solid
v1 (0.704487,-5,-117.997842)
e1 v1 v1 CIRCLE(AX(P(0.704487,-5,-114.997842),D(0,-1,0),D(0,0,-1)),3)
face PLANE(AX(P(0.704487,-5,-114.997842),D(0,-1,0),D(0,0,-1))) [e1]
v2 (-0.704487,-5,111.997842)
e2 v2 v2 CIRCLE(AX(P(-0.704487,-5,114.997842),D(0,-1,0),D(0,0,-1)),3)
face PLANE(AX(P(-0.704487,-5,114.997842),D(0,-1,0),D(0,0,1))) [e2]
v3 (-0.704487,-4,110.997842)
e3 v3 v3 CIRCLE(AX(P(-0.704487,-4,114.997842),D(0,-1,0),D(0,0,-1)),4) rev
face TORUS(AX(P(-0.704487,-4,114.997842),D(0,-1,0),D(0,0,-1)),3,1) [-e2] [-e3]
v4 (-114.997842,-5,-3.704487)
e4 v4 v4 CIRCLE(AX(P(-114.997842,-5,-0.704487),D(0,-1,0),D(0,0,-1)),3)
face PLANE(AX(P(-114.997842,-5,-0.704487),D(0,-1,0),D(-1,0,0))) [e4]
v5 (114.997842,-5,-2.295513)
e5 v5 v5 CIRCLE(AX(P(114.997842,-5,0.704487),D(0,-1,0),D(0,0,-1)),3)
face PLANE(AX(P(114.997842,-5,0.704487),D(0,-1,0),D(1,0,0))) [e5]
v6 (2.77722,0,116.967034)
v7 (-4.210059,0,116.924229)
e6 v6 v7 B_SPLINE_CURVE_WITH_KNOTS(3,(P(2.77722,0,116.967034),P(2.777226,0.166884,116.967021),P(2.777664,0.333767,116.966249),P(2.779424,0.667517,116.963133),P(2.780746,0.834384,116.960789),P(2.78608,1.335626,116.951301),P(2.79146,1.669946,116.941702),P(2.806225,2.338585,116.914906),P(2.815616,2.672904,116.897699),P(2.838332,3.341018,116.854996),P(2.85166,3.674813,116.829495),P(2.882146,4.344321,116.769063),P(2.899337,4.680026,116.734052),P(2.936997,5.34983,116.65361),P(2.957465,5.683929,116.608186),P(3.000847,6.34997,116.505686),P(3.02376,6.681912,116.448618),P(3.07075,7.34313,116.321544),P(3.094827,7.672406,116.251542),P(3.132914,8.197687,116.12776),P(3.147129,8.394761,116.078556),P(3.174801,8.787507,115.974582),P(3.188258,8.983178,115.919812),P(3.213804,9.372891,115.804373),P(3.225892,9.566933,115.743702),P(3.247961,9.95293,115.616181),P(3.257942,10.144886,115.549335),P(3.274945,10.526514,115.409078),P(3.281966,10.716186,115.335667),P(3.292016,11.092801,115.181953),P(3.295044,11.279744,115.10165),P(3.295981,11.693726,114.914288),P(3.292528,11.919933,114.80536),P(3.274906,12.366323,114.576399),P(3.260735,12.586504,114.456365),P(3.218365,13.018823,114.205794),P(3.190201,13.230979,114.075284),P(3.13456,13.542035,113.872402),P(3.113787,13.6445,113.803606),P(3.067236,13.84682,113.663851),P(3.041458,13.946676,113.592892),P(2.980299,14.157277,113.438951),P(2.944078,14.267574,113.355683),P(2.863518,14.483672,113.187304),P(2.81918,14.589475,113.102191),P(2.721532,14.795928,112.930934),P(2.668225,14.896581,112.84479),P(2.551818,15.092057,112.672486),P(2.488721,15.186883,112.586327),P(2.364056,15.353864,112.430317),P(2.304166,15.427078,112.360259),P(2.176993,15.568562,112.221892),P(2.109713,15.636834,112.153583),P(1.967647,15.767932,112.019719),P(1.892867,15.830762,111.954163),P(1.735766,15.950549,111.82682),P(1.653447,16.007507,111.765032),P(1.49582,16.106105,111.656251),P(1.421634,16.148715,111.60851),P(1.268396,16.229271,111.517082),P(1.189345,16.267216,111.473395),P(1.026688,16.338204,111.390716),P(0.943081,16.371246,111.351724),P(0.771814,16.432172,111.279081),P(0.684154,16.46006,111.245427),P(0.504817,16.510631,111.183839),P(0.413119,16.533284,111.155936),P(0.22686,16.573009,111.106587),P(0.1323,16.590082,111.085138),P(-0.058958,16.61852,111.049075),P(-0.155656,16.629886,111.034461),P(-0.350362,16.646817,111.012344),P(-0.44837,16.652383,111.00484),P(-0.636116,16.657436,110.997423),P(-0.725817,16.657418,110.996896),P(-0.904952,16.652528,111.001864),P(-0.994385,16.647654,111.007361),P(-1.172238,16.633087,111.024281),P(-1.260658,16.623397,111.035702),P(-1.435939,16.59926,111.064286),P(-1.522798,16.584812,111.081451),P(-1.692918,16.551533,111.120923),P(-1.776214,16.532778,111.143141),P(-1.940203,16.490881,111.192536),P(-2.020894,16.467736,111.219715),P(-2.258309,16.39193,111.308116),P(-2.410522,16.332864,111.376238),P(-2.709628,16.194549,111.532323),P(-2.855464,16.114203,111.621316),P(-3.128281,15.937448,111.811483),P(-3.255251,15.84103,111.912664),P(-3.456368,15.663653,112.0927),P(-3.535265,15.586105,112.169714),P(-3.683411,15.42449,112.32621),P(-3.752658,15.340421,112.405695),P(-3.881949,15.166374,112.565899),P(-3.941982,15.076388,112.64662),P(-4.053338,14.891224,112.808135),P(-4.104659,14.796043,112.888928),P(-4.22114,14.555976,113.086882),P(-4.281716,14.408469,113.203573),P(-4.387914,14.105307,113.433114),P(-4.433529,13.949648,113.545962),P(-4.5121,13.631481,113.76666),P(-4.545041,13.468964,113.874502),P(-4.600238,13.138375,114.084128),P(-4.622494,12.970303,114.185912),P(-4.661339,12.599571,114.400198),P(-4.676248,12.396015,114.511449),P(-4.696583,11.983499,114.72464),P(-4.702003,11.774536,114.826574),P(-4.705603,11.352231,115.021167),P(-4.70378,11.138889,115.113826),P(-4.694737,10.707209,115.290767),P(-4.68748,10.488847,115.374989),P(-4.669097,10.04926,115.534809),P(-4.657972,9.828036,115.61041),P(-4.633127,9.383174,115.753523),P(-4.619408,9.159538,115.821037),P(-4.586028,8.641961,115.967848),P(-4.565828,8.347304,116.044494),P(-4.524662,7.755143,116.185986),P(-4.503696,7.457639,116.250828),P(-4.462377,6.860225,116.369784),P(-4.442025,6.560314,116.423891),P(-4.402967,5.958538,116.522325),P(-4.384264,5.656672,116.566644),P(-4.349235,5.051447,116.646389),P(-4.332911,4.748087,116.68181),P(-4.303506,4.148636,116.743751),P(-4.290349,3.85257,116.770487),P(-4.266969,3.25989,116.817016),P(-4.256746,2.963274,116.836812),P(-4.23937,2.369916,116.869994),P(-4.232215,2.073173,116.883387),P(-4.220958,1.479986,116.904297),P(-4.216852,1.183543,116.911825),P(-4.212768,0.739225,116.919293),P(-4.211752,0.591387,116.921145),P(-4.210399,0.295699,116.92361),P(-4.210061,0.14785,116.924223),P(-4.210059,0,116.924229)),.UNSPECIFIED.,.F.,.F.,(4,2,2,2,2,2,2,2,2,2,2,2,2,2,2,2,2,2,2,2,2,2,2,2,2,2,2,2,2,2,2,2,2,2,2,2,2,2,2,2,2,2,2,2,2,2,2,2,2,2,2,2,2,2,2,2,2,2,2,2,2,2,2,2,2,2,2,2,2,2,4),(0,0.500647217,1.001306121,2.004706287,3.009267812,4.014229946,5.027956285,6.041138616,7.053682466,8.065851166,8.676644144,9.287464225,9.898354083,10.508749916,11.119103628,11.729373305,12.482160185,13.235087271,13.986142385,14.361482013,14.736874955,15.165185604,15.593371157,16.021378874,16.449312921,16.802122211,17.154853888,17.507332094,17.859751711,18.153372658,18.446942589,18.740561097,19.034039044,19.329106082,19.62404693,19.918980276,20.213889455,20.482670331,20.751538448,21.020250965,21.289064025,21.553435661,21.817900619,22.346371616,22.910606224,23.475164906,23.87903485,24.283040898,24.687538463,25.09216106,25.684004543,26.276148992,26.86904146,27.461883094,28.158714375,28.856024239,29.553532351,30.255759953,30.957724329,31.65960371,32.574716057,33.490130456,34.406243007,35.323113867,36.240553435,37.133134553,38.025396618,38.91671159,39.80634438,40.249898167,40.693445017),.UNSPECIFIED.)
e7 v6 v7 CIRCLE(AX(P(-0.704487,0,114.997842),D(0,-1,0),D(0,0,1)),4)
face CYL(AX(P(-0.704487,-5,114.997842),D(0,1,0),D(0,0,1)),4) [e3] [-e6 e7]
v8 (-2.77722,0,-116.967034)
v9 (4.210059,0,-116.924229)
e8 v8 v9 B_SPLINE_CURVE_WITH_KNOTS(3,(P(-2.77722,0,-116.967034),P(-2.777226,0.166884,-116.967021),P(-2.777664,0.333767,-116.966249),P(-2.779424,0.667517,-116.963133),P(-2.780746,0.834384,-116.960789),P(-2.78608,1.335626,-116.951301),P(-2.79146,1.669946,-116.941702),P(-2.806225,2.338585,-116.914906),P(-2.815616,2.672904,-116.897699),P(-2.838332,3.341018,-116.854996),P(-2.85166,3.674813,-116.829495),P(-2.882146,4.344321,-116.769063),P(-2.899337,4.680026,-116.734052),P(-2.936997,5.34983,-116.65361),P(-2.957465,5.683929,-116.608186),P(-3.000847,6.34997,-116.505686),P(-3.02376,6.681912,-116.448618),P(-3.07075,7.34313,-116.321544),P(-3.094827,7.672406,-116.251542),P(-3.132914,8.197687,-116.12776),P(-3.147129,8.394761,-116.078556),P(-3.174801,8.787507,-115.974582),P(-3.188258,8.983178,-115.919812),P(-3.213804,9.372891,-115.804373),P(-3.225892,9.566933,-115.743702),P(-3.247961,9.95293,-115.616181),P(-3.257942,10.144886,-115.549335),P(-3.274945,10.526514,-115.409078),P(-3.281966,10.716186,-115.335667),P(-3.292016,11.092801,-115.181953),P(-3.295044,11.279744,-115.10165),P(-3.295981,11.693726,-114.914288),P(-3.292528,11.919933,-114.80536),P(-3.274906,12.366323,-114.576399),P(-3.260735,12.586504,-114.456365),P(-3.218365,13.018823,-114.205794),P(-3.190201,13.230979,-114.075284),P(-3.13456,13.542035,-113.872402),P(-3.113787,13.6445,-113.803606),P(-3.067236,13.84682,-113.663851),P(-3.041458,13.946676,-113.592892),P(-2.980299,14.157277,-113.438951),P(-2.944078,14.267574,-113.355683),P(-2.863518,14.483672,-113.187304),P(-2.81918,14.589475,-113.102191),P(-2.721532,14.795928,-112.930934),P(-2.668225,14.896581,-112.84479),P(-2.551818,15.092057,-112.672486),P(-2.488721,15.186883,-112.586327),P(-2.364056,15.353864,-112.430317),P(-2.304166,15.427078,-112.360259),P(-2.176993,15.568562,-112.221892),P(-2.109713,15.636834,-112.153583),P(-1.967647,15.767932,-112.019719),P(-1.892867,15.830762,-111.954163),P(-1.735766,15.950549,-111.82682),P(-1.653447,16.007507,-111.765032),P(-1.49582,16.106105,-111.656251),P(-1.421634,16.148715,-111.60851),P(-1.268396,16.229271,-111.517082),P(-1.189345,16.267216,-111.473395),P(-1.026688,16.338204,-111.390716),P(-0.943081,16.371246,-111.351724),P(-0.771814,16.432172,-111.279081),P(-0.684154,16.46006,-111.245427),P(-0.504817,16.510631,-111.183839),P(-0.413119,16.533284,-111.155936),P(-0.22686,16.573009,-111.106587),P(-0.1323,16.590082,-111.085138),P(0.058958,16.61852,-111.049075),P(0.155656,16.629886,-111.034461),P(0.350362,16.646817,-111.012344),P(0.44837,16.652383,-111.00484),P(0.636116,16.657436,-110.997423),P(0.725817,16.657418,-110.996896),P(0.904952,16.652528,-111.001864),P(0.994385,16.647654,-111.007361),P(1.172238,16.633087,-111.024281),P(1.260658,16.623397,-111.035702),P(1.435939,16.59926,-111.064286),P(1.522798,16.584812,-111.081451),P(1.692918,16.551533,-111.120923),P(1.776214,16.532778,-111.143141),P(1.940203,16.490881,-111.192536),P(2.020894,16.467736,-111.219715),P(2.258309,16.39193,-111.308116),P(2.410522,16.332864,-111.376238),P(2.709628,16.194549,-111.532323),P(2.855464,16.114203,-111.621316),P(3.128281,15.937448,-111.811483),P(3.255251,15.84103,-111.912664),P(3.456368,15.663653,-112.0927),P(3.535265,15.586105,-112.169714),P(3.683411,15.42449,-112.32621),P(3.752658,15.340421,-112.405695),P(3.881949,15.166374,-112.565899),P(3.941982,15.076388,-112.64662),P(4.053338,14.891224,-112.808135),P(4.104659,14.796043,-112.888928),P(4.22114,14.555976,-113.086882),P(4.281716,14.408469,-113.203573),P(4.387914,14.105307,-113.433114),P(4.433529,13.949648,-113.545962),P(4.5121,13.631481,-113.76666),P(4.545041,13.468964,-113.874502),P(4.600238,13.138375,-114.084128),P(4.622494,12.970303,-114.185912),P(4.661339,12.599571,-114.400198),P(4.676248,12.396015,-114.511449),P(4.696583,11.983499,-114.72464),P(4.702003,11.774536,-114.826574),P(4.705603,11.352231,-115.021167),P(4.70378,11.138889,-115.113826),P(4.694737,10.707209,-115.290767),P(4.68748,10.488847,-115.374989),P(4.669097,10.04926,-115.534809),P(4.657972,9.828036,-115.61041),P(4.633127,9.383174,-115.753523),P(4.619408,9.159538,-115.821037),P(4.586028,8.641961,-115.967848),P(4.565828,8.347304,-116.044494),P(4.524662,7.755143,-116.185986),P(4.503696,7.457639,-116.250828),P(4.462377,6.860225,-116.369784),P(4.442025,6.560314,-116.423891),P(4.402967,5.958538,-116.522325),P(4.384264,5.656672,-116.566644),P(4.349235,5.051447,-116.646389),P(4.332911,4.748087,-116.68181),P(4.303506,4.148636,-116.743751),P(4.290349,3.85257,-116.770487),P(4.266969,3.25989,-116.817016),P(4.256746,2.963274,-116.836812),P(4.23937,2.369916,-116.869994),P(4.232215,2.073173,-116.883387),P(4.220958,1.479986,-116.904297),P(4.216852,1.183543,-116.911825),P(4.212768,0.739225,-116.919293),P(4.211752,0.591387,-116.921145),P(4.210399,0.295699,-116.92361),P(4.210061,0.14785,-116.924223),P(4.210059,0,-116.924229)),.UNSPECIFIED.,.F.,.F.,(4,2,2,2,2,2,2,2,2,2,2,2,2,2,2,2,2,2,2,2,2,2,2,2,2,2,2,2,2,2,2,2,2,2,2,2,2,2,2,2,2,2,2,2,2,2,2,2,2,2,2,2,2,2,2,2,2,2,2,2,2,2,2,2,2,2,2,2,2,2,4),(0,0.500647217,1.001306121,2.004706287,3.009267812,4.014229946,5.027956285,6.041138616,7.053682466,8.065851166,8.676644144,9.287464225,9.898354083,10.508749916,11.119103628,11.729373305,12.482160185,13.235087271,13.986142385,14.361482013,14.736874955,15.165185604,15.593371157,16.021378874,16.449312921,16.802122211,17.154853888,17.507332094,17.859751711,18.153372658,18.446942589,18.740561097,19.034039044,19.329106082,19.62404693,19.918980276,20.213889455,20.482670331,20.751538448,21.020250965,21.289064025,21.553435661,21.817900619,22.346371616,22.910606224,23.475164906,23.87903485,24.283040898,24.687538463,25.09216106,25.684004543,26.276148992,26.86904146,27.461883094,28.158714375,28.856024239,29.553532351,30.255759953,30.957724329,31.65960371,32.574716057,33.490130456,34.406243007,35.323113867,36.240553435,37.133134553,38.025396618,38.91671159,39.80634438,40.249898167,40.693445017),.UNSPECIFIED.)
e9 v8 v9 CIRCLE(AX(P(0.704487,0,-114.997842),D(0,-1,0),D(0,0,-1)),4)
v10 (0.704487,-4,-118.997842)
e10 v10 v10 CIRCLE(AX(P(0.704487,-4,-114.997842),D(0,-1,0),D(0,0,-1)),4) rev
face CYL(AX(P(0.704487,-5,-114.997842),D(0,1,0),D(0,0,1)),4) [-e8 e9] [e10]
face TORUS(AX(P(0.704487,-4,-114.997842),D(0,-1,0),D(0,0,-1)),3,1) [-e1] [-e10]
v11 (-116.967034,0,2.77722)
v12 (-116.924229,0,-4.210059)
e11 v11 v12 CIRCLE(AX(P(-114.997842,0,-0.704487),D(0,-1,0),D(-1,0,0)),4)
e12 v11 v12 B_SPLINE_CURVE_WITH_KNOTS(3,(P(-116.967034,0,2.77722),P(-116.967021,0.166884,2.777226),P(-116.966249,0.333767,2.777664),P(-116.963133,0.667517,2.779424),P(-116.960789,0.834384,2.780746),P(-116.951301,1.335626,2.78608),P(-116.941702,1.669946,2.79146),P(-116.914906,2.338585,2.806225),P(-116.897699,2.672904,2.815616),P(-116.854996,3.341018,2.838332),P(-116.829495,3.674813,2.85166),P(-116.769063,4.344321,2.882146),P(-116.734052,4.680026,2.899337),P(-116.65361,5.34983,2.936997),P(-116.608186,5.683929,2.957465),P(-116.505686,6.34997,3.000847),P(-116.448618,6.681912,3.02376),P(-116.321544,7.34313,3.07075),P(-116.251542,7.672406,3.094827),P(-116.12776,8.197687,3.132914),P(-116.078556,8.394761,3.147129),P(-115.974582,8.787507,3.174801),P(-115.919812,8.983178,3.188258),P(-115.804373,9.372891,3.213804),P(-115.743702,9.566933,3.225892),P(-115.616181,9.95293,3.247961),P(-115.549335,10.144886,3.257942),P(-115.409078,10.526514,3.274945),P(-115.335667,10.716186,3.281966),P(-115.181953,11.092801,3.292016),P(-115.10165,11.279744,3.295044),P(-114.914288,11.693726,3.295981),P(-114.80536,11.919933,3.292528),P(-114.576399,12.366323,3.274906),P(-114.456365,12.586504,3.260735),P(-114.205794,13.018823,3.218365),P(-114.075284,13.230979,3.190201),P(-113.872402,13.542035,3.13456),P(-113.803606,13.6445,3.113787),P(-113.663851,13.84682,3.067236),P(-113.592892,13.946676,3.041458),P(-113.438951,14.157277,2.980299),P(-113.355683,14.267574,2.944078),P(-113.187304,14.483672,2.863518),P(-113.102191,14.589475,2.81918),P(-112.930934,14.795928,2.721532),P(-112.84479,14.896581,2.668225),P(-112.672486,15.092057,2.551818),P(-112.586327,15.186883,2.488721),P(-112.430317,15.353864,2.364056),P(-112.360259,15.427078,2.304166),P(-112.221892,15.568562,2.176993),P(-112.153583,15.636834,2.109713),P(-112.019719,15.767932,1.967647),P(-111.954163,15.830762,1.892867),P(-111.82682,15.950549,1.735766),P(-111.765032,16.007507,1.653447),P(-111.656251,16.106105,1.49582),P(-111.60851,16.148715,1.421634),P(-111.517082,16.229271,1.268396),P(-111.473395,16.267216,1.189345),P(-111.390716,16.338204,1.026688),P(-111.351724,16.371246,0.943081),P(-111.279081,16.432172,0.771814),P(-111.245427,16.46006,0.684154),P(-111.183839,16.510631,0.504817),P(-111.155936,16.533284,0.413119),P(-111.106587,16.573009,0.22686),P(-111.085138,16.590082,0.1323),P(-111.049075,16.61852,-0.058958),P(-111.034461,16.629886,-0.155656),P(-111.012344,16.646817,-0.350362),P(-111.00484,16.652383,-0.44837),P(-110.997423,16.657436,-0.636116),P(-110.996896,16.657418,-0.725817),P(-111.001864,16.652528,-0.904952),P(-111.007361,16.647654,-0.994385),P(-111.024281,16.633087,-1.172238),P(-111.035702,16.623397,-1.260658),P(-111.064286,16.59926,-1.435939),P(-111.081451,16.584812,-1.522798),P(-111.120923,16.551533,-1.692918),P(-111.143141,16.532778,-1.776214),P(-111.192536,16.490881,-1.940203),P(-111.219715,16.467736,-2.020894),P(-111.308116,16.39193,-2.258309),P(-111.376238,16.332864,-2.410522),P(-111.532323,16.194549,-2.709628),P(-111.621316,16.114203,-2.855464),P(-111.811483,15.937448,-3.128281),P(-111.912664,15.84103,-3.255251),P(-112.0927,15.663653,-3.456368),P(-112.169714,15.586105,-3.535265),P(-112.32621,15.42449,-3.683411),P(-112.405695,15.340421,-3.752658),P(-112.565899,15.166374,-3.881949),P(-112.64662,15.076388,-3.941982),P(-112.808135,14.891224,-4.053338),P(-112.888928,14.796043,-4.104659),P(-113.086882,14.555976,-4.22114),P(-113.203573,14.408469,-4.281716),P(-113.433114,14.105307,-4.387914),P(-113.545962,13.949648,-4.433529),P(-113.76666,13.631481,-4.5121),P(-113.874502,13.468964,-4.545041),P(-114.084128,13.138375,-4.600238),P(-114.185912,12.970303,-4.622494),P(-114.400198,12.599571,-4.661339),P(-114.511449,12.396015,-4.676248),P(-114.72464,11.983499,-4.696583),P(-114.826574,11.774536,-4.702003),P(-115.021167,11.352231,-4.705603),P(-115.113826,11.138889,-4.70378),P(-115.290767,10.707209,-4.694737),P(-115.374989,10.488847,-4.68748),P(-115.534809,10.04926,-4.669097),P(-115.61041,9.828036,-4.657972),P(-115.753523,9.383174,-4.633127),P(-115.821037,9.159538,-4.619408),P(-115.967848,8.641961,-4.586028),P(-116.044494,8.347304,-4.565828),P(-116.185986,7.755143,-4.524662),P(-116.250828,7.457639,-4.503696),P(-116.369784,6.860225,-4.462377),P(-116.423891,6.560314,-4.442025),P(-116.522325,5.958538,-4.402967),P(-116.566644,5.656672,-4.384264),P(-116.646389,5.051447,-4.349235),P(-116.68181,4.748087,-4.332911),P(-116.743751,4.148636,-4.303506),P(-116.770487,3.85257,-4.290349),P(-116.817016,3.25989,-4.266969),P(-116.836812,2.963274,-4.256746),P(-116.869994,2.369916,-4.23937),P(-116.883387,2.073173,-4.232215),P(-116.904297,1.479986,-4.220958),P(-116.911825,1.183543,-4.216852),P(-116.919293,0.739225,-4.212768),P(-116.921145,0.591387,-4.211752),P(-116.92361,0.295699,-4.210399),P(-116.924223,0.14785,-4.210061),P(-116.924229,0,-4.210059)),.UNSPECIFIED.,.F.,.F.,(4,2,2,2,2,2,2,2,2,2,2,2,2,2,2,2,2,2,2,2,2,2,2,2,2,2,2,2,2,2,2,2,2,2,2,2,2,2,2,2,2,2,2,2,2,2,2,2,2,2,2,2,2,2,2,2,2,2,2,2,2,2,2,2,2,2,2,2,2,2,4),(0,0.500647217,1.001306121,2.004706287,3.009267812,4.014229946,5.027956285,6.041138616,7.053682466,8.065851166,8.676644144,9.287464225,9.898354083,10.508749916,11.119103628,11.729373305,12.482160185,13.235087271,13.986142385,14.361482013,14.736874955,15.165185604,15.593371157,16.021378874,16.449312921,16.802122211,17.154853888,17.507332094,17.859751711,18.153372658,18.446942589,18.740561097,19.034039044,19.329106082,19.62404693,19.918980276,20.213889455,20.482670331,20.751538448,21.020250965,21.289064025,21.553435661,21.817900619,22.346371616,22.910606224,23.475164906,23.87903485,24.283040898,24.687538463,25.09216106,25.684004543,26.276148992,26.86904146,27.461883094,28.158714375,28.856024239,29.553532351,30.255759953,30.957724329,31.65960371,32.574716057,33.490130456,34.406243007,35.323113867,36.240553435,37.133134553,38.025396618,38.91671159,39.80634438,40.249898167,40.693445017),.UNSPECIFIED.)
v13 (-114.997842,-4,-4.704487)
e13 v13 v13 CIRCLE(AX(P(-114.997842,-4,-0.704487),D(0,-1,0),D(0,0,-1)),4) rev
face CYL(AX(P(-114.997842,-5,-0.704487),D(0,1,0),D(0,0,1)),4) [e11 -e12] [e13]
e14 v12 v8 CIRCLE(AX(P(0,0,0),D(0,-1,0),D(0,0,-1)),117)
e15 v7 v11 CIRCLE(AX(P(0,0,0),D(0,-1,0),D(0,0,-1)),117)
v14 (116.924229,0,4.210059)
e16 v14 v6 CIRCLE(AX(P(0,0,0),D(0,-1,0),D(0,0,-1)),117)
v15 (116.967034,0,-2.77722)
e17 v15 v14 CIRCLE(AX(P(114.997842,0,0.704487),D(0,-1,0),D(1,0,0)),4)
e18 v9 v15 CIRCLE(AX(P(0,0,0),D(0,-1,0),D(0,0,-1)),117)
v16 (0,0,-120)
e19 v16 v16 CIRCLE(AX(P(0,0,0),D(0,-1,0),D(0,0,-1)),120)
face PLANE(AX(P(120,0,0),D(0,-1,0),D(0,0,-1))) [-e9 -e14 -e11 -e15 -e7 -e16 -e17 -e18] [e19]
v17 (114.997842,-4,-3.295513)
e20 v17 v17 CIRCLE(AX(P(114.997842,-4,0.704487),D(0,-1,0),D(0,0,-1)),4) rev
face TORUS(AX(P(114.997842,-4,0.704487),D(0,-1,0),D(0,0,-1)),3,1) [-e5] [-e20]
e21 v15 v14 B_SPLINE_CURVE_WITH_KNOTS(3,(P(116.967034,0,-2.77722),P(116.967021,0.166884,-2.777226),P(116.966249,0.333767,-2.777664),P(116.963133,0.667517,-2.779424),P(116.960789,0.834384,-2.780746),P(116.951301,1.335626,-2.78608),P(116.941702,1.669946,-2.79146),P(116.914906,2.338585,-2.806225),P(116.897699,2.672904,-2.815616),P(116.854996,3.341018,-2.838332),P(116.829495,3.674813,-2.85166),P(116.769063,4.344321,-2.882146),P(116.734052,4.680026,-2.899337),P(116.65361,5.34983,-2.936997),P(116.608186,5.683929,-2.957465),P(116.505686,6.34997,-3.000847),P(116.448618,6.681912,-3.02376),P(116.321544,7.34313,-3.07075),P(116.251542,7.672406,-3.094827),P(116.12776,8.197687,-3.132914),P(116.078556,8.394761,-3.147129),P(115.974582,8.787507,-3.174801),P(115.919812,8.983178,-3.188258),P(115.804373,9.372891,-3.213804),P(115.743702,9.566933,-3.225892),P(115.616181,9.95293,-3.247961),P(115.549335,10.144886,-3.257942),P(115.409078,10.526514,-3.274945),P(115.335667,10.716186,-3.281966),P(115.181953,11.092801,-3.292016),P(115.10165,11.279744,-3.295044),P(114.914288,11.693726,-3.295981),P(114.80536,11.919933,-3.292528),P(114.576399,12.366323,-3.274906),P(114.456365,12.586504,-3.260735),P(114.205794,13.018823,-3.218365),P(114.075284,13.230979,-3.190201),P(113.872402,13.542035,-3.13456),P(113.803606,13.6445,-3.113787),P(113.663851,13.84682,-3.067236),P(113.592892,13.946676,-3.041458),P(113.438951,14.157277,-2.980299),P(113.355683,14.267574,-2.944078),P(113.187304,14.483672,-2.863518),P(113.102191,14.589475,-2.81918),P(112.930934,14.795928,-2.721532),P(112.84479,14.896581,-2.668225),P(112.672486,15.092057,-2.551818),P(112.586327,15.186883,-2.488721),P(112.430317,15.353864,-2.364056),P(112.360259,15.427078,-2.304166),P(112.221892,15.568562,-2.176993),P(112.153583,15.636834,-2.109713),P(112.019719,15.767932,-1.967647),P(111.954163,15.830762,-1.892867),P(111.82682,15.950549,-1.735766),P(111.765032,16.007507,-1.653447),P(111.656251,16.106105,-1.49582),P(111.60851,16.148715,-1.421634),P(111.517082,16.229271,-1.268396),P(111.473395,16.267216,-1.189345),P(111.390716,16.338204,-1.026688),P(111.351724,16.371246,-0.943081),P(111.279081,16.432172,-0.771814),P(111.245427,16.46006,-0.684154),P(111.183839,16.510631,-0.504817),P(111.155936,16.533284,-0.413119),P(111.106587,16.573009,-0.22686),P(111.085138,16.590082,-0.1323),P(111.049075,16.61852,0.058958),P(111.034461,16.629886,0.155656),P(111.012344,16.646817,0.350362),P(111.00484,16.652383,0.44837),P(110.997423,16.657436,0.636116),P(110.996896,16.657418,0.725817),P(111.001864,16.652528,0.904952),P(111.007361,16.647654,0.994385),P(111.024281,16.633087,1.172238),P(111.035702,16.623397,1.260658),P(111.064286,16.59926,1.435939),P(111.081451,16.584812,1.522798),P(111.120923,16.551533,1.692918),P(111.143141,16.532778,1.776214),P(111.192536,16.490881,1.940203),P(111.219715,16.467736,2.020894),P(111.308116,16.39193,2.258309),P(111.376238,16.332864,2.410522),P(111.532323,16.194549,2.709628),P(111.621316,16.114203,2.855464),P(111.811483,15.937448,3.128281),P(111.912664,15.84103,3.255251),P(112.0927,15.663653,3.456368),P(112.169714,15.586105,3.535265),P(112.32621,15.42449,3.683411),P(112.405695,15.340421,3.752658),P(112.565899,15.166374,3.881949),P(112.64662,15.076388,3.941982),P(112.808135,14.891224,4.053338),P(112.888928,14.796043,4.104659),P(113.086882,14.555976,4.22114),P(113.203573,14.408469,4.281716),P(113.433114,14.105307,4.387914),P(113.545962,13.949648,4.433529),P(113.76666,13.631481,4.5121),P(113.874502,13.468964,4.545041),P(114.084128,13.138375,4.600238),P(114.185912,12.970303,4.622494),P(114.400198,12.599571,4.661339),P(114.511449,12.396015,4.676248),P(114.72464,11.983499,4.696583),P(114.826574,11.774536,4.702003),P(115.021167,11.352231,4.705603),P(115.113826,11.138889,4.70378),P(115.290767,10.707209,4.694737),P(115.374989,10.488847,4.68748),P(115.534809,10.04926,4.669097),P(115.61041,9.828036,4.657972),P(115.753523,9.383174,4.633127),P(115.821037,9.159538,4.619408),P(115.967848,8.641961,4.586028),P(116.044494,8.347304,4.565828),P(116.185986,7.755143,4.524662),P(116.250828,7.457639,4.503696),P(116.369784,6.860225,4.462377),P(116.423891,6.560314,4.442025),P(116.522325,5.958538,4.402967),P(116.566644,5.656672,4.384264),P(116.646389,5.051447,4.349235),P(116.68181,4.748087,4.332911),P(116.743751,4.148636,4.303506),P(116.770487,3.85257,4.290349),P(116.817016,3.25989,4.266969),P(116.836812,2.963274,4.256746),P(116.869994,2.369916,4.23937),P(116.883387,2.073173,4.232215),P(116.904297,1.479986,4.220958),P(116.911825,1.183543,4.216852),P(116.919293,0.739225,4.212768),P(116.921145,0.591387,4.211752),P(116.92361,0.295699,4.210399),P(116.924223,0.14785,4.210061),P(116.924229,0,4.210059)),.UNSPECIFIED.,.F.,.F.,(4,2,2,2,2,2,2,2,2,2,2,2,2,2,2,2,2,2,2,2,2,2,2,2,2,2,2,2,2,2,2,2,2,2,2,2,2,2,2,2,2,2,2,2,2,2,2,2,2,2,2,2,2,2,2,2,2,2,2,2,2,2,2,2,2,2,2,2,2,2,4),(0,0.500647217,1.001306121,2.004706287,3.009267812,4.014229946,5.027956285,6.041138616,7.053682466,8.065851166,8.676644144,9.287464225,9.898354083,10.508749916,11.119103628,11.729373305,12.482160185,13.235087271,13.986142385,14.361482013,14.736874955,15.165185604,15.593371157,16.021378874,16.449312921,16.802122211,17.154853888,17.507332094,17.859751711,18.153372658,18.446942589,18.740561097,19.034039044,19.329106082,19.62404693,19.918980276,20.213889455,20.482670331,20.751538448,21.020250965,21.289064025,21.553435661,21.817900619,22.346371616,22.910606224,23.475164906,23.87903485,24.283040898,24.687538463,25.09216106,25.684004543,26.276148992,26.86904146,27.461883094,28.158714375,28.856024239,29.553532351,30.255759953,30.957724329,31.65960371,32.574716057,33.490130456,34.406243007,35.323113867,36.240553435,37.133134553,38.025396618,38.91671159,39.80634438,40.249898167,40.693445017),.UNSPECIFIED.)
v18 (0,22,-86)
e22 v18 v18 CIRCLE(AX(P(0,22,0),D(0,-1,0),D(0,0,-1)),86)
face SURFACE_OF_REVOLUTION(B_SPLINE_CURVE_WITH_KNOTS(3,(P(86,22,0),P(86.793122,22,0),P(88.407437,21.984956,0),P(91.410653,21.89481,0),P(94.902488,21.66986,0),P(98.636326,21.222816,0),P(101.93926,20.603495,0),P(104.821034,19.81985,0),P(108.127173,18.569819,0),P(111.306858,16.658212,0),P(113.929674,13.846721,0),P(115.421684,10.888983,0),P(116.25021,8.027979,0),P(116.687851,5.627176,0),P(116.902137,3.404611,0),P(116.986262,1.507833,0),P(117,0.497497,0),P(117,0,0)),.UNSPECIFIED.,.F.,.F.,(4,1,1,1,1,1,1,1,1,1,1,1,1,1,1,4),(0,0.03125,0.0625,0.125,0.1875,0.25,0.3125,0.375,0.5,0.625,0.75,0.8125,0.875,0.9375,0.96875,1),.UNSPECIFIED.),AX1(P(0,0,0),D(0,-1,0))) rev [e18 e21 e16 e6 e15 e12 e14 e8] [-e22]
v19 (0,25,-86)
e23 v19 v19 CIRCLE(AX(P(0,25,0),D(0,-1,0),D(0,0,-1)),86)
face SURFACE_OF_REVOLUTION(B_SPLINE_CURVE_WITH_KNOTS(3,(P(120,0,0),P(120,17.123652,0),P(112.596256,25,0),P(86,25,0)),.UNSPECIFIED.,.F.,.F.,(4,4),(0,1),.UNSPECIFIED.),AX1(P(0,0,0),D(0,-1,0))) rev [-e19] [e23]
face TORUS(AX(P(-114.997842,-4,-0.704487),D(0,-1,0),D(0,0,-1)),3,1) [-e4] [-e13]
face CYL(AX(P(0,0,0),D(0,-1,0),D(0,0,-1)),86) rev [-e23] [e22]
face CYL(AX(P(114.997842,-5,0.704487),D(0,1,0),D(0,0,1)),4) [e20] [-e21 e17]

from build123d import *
from build123d.topology import SkipClean

# Parameters (mm, degrees)
BOSS_EXTRUDE1_REACH             = 173.537
SKETCH2_R                       = 4
BOSS_EXTRUDE1_DIRECTION_2_DEPTH = 5
FILLET1_R                       = 1
CIRPATTERN1_COUNT               = 4
FILLET1_OF_CIRPATTERN1_R        = 1


with BuildPart() as part:
    # Sketch1 → Revolve1 (revolve)
    with BuildSketch(Plane.XY, mode=Mode.PRIVATE) as revolve1_sk:
        with BuildLine():
            Line((120, 0), (117, 0))
            add(Edge.make_bspline(
                [(117, 0), (117, 0.497497152), (116.986262169, 1.507832917), (116.902136822, 3.404611076), (116.687851434, 5.627176487), (116.250209749, 8.027978525), (115.42168448, 10.888982801), (113.929674225, 13.846720573), (111.306858378, 16.658211895), (108.12717348, 18.569818628), (104.821034458, 19.819850194), (101.939259689, 20.603494586), (98.636326369, 21.222815885), (94.902488463, 21.669859699), (91.41065321, 21.894810067), (88.407436668, 21.984956205), (86.793122341, 22), (86, 22)],
                knots=[0, 0, 0, 0, 0.03125, 0.0625, 0.125, 0.1875, 0.25, 0.375, 0.5, 0.625, 0.6875, 0.75, 0.8125, 0.875, 0.9375, 0.96875, 1, 1, 1, 1], degree=3))
            Line((86, 22), (86, 25))
            add(Edge.make_bspline(
                [(120, 0), (120, 17.123651826), (112.596256225, 25), (86, 25)],
                knots=[0, 0, 0, 0, 1, 1, 1, 1], degree=3))
        make_face()
    revolve(revolve1_sk.sketch.rotate(Axis((0, 0, 0), (0, 1, 0)), 90), axis=Axis((0, 0, 0), (0, 1, 0)))

    # Sketch2 → Boss-Extrude1 (add, up to next)
    with BuildSketch(Plane(origin=(0, 0, 0), x_dir=(-1, 0, 0), z_dir=(0, -1, 0)), mode=Mode.PRIVATE) as boss_extrude1_sk1:
        with Locations(Location((-0.704487, 114.997842145, 0), (0, 0, 212.91403277))):
            Circle(SKETCH2_R)
    boss_extrude1_tool1 = extrude(boss_extrude1_sk1.sketch, amount=-BOSS_EXTRUDE1_REACH, mode=Mode.PRIVATE) - part.part
    boss_extrude1 = boss_extrude1_tool1.solids().sort_by_distance((0.704487, 0, -114.997842))[0]
    add(boss_extrude1)

    # Sketch2 → Boss-Extrude1 direction 2 (add)
    with SkipClean():  # the faces are left unmerged after this step: merging them gives an invalid solid
        with BuildSketch(Plane(origin=(0, 0, 0), x_dir=(-1, 0, 0), z_dir=(0, -1, 0))):
            with Locations(Location((-0.704487, 114.997842145, 0), (0, 0, 212.91403277))):
                Circle(SKETCH2_R)
        boss_extrude1_direction_2 = extrude(amount=BOSS_EXTRUDE1_DIRECTION_2_DEPTH)
    add(part.part.scale(1), mode=Mode.REPLACE)  # the faces are merged on a copy

    # Fillet1
    fillet1_edges = [part.edges().sort_by_distance(p)[0] for p in [
        (-2.653460224, -5, -117.171362432),
    ]]
    fillet(fillet1_edges, radius=FILLET1_R)

    # CirPattern1: Boss-Extrude1, Boss-Extrude1 direction 2 ×4 about axis
    cirpattern1_axis = Axis((0, 0, 0), (0, 1, 0))
    add([boss_extrude1.rotate(cirpattern1_axis, i * 360 / CIRPATTERN1_COUNT) for i in range(1, CIRPATTERN1_COUNT)])
    add([boss_extrude1_direction_2.rotate(cirpattern1_axis, i * 360 / CIRPATTERN1_COUNT) for i in range(1, CIRPATTERN1_COUNT)])

    # Fillet1 of CirPattern1
    fillet1_of_cirpattern1_edges = [part.edges().sort_by_distance(p)[0] for p in [
        (-117.171362432, -5, 2.653460224),
        (2.653460224, -5, 117.171362432),
        (117.171362432, -5, -2.653460224),
    ]]
    fillet(fillet1_of_cirpattern1_edges, radius=FILLET1_OF_CIRPATTERN1_R)


solid = part.part
